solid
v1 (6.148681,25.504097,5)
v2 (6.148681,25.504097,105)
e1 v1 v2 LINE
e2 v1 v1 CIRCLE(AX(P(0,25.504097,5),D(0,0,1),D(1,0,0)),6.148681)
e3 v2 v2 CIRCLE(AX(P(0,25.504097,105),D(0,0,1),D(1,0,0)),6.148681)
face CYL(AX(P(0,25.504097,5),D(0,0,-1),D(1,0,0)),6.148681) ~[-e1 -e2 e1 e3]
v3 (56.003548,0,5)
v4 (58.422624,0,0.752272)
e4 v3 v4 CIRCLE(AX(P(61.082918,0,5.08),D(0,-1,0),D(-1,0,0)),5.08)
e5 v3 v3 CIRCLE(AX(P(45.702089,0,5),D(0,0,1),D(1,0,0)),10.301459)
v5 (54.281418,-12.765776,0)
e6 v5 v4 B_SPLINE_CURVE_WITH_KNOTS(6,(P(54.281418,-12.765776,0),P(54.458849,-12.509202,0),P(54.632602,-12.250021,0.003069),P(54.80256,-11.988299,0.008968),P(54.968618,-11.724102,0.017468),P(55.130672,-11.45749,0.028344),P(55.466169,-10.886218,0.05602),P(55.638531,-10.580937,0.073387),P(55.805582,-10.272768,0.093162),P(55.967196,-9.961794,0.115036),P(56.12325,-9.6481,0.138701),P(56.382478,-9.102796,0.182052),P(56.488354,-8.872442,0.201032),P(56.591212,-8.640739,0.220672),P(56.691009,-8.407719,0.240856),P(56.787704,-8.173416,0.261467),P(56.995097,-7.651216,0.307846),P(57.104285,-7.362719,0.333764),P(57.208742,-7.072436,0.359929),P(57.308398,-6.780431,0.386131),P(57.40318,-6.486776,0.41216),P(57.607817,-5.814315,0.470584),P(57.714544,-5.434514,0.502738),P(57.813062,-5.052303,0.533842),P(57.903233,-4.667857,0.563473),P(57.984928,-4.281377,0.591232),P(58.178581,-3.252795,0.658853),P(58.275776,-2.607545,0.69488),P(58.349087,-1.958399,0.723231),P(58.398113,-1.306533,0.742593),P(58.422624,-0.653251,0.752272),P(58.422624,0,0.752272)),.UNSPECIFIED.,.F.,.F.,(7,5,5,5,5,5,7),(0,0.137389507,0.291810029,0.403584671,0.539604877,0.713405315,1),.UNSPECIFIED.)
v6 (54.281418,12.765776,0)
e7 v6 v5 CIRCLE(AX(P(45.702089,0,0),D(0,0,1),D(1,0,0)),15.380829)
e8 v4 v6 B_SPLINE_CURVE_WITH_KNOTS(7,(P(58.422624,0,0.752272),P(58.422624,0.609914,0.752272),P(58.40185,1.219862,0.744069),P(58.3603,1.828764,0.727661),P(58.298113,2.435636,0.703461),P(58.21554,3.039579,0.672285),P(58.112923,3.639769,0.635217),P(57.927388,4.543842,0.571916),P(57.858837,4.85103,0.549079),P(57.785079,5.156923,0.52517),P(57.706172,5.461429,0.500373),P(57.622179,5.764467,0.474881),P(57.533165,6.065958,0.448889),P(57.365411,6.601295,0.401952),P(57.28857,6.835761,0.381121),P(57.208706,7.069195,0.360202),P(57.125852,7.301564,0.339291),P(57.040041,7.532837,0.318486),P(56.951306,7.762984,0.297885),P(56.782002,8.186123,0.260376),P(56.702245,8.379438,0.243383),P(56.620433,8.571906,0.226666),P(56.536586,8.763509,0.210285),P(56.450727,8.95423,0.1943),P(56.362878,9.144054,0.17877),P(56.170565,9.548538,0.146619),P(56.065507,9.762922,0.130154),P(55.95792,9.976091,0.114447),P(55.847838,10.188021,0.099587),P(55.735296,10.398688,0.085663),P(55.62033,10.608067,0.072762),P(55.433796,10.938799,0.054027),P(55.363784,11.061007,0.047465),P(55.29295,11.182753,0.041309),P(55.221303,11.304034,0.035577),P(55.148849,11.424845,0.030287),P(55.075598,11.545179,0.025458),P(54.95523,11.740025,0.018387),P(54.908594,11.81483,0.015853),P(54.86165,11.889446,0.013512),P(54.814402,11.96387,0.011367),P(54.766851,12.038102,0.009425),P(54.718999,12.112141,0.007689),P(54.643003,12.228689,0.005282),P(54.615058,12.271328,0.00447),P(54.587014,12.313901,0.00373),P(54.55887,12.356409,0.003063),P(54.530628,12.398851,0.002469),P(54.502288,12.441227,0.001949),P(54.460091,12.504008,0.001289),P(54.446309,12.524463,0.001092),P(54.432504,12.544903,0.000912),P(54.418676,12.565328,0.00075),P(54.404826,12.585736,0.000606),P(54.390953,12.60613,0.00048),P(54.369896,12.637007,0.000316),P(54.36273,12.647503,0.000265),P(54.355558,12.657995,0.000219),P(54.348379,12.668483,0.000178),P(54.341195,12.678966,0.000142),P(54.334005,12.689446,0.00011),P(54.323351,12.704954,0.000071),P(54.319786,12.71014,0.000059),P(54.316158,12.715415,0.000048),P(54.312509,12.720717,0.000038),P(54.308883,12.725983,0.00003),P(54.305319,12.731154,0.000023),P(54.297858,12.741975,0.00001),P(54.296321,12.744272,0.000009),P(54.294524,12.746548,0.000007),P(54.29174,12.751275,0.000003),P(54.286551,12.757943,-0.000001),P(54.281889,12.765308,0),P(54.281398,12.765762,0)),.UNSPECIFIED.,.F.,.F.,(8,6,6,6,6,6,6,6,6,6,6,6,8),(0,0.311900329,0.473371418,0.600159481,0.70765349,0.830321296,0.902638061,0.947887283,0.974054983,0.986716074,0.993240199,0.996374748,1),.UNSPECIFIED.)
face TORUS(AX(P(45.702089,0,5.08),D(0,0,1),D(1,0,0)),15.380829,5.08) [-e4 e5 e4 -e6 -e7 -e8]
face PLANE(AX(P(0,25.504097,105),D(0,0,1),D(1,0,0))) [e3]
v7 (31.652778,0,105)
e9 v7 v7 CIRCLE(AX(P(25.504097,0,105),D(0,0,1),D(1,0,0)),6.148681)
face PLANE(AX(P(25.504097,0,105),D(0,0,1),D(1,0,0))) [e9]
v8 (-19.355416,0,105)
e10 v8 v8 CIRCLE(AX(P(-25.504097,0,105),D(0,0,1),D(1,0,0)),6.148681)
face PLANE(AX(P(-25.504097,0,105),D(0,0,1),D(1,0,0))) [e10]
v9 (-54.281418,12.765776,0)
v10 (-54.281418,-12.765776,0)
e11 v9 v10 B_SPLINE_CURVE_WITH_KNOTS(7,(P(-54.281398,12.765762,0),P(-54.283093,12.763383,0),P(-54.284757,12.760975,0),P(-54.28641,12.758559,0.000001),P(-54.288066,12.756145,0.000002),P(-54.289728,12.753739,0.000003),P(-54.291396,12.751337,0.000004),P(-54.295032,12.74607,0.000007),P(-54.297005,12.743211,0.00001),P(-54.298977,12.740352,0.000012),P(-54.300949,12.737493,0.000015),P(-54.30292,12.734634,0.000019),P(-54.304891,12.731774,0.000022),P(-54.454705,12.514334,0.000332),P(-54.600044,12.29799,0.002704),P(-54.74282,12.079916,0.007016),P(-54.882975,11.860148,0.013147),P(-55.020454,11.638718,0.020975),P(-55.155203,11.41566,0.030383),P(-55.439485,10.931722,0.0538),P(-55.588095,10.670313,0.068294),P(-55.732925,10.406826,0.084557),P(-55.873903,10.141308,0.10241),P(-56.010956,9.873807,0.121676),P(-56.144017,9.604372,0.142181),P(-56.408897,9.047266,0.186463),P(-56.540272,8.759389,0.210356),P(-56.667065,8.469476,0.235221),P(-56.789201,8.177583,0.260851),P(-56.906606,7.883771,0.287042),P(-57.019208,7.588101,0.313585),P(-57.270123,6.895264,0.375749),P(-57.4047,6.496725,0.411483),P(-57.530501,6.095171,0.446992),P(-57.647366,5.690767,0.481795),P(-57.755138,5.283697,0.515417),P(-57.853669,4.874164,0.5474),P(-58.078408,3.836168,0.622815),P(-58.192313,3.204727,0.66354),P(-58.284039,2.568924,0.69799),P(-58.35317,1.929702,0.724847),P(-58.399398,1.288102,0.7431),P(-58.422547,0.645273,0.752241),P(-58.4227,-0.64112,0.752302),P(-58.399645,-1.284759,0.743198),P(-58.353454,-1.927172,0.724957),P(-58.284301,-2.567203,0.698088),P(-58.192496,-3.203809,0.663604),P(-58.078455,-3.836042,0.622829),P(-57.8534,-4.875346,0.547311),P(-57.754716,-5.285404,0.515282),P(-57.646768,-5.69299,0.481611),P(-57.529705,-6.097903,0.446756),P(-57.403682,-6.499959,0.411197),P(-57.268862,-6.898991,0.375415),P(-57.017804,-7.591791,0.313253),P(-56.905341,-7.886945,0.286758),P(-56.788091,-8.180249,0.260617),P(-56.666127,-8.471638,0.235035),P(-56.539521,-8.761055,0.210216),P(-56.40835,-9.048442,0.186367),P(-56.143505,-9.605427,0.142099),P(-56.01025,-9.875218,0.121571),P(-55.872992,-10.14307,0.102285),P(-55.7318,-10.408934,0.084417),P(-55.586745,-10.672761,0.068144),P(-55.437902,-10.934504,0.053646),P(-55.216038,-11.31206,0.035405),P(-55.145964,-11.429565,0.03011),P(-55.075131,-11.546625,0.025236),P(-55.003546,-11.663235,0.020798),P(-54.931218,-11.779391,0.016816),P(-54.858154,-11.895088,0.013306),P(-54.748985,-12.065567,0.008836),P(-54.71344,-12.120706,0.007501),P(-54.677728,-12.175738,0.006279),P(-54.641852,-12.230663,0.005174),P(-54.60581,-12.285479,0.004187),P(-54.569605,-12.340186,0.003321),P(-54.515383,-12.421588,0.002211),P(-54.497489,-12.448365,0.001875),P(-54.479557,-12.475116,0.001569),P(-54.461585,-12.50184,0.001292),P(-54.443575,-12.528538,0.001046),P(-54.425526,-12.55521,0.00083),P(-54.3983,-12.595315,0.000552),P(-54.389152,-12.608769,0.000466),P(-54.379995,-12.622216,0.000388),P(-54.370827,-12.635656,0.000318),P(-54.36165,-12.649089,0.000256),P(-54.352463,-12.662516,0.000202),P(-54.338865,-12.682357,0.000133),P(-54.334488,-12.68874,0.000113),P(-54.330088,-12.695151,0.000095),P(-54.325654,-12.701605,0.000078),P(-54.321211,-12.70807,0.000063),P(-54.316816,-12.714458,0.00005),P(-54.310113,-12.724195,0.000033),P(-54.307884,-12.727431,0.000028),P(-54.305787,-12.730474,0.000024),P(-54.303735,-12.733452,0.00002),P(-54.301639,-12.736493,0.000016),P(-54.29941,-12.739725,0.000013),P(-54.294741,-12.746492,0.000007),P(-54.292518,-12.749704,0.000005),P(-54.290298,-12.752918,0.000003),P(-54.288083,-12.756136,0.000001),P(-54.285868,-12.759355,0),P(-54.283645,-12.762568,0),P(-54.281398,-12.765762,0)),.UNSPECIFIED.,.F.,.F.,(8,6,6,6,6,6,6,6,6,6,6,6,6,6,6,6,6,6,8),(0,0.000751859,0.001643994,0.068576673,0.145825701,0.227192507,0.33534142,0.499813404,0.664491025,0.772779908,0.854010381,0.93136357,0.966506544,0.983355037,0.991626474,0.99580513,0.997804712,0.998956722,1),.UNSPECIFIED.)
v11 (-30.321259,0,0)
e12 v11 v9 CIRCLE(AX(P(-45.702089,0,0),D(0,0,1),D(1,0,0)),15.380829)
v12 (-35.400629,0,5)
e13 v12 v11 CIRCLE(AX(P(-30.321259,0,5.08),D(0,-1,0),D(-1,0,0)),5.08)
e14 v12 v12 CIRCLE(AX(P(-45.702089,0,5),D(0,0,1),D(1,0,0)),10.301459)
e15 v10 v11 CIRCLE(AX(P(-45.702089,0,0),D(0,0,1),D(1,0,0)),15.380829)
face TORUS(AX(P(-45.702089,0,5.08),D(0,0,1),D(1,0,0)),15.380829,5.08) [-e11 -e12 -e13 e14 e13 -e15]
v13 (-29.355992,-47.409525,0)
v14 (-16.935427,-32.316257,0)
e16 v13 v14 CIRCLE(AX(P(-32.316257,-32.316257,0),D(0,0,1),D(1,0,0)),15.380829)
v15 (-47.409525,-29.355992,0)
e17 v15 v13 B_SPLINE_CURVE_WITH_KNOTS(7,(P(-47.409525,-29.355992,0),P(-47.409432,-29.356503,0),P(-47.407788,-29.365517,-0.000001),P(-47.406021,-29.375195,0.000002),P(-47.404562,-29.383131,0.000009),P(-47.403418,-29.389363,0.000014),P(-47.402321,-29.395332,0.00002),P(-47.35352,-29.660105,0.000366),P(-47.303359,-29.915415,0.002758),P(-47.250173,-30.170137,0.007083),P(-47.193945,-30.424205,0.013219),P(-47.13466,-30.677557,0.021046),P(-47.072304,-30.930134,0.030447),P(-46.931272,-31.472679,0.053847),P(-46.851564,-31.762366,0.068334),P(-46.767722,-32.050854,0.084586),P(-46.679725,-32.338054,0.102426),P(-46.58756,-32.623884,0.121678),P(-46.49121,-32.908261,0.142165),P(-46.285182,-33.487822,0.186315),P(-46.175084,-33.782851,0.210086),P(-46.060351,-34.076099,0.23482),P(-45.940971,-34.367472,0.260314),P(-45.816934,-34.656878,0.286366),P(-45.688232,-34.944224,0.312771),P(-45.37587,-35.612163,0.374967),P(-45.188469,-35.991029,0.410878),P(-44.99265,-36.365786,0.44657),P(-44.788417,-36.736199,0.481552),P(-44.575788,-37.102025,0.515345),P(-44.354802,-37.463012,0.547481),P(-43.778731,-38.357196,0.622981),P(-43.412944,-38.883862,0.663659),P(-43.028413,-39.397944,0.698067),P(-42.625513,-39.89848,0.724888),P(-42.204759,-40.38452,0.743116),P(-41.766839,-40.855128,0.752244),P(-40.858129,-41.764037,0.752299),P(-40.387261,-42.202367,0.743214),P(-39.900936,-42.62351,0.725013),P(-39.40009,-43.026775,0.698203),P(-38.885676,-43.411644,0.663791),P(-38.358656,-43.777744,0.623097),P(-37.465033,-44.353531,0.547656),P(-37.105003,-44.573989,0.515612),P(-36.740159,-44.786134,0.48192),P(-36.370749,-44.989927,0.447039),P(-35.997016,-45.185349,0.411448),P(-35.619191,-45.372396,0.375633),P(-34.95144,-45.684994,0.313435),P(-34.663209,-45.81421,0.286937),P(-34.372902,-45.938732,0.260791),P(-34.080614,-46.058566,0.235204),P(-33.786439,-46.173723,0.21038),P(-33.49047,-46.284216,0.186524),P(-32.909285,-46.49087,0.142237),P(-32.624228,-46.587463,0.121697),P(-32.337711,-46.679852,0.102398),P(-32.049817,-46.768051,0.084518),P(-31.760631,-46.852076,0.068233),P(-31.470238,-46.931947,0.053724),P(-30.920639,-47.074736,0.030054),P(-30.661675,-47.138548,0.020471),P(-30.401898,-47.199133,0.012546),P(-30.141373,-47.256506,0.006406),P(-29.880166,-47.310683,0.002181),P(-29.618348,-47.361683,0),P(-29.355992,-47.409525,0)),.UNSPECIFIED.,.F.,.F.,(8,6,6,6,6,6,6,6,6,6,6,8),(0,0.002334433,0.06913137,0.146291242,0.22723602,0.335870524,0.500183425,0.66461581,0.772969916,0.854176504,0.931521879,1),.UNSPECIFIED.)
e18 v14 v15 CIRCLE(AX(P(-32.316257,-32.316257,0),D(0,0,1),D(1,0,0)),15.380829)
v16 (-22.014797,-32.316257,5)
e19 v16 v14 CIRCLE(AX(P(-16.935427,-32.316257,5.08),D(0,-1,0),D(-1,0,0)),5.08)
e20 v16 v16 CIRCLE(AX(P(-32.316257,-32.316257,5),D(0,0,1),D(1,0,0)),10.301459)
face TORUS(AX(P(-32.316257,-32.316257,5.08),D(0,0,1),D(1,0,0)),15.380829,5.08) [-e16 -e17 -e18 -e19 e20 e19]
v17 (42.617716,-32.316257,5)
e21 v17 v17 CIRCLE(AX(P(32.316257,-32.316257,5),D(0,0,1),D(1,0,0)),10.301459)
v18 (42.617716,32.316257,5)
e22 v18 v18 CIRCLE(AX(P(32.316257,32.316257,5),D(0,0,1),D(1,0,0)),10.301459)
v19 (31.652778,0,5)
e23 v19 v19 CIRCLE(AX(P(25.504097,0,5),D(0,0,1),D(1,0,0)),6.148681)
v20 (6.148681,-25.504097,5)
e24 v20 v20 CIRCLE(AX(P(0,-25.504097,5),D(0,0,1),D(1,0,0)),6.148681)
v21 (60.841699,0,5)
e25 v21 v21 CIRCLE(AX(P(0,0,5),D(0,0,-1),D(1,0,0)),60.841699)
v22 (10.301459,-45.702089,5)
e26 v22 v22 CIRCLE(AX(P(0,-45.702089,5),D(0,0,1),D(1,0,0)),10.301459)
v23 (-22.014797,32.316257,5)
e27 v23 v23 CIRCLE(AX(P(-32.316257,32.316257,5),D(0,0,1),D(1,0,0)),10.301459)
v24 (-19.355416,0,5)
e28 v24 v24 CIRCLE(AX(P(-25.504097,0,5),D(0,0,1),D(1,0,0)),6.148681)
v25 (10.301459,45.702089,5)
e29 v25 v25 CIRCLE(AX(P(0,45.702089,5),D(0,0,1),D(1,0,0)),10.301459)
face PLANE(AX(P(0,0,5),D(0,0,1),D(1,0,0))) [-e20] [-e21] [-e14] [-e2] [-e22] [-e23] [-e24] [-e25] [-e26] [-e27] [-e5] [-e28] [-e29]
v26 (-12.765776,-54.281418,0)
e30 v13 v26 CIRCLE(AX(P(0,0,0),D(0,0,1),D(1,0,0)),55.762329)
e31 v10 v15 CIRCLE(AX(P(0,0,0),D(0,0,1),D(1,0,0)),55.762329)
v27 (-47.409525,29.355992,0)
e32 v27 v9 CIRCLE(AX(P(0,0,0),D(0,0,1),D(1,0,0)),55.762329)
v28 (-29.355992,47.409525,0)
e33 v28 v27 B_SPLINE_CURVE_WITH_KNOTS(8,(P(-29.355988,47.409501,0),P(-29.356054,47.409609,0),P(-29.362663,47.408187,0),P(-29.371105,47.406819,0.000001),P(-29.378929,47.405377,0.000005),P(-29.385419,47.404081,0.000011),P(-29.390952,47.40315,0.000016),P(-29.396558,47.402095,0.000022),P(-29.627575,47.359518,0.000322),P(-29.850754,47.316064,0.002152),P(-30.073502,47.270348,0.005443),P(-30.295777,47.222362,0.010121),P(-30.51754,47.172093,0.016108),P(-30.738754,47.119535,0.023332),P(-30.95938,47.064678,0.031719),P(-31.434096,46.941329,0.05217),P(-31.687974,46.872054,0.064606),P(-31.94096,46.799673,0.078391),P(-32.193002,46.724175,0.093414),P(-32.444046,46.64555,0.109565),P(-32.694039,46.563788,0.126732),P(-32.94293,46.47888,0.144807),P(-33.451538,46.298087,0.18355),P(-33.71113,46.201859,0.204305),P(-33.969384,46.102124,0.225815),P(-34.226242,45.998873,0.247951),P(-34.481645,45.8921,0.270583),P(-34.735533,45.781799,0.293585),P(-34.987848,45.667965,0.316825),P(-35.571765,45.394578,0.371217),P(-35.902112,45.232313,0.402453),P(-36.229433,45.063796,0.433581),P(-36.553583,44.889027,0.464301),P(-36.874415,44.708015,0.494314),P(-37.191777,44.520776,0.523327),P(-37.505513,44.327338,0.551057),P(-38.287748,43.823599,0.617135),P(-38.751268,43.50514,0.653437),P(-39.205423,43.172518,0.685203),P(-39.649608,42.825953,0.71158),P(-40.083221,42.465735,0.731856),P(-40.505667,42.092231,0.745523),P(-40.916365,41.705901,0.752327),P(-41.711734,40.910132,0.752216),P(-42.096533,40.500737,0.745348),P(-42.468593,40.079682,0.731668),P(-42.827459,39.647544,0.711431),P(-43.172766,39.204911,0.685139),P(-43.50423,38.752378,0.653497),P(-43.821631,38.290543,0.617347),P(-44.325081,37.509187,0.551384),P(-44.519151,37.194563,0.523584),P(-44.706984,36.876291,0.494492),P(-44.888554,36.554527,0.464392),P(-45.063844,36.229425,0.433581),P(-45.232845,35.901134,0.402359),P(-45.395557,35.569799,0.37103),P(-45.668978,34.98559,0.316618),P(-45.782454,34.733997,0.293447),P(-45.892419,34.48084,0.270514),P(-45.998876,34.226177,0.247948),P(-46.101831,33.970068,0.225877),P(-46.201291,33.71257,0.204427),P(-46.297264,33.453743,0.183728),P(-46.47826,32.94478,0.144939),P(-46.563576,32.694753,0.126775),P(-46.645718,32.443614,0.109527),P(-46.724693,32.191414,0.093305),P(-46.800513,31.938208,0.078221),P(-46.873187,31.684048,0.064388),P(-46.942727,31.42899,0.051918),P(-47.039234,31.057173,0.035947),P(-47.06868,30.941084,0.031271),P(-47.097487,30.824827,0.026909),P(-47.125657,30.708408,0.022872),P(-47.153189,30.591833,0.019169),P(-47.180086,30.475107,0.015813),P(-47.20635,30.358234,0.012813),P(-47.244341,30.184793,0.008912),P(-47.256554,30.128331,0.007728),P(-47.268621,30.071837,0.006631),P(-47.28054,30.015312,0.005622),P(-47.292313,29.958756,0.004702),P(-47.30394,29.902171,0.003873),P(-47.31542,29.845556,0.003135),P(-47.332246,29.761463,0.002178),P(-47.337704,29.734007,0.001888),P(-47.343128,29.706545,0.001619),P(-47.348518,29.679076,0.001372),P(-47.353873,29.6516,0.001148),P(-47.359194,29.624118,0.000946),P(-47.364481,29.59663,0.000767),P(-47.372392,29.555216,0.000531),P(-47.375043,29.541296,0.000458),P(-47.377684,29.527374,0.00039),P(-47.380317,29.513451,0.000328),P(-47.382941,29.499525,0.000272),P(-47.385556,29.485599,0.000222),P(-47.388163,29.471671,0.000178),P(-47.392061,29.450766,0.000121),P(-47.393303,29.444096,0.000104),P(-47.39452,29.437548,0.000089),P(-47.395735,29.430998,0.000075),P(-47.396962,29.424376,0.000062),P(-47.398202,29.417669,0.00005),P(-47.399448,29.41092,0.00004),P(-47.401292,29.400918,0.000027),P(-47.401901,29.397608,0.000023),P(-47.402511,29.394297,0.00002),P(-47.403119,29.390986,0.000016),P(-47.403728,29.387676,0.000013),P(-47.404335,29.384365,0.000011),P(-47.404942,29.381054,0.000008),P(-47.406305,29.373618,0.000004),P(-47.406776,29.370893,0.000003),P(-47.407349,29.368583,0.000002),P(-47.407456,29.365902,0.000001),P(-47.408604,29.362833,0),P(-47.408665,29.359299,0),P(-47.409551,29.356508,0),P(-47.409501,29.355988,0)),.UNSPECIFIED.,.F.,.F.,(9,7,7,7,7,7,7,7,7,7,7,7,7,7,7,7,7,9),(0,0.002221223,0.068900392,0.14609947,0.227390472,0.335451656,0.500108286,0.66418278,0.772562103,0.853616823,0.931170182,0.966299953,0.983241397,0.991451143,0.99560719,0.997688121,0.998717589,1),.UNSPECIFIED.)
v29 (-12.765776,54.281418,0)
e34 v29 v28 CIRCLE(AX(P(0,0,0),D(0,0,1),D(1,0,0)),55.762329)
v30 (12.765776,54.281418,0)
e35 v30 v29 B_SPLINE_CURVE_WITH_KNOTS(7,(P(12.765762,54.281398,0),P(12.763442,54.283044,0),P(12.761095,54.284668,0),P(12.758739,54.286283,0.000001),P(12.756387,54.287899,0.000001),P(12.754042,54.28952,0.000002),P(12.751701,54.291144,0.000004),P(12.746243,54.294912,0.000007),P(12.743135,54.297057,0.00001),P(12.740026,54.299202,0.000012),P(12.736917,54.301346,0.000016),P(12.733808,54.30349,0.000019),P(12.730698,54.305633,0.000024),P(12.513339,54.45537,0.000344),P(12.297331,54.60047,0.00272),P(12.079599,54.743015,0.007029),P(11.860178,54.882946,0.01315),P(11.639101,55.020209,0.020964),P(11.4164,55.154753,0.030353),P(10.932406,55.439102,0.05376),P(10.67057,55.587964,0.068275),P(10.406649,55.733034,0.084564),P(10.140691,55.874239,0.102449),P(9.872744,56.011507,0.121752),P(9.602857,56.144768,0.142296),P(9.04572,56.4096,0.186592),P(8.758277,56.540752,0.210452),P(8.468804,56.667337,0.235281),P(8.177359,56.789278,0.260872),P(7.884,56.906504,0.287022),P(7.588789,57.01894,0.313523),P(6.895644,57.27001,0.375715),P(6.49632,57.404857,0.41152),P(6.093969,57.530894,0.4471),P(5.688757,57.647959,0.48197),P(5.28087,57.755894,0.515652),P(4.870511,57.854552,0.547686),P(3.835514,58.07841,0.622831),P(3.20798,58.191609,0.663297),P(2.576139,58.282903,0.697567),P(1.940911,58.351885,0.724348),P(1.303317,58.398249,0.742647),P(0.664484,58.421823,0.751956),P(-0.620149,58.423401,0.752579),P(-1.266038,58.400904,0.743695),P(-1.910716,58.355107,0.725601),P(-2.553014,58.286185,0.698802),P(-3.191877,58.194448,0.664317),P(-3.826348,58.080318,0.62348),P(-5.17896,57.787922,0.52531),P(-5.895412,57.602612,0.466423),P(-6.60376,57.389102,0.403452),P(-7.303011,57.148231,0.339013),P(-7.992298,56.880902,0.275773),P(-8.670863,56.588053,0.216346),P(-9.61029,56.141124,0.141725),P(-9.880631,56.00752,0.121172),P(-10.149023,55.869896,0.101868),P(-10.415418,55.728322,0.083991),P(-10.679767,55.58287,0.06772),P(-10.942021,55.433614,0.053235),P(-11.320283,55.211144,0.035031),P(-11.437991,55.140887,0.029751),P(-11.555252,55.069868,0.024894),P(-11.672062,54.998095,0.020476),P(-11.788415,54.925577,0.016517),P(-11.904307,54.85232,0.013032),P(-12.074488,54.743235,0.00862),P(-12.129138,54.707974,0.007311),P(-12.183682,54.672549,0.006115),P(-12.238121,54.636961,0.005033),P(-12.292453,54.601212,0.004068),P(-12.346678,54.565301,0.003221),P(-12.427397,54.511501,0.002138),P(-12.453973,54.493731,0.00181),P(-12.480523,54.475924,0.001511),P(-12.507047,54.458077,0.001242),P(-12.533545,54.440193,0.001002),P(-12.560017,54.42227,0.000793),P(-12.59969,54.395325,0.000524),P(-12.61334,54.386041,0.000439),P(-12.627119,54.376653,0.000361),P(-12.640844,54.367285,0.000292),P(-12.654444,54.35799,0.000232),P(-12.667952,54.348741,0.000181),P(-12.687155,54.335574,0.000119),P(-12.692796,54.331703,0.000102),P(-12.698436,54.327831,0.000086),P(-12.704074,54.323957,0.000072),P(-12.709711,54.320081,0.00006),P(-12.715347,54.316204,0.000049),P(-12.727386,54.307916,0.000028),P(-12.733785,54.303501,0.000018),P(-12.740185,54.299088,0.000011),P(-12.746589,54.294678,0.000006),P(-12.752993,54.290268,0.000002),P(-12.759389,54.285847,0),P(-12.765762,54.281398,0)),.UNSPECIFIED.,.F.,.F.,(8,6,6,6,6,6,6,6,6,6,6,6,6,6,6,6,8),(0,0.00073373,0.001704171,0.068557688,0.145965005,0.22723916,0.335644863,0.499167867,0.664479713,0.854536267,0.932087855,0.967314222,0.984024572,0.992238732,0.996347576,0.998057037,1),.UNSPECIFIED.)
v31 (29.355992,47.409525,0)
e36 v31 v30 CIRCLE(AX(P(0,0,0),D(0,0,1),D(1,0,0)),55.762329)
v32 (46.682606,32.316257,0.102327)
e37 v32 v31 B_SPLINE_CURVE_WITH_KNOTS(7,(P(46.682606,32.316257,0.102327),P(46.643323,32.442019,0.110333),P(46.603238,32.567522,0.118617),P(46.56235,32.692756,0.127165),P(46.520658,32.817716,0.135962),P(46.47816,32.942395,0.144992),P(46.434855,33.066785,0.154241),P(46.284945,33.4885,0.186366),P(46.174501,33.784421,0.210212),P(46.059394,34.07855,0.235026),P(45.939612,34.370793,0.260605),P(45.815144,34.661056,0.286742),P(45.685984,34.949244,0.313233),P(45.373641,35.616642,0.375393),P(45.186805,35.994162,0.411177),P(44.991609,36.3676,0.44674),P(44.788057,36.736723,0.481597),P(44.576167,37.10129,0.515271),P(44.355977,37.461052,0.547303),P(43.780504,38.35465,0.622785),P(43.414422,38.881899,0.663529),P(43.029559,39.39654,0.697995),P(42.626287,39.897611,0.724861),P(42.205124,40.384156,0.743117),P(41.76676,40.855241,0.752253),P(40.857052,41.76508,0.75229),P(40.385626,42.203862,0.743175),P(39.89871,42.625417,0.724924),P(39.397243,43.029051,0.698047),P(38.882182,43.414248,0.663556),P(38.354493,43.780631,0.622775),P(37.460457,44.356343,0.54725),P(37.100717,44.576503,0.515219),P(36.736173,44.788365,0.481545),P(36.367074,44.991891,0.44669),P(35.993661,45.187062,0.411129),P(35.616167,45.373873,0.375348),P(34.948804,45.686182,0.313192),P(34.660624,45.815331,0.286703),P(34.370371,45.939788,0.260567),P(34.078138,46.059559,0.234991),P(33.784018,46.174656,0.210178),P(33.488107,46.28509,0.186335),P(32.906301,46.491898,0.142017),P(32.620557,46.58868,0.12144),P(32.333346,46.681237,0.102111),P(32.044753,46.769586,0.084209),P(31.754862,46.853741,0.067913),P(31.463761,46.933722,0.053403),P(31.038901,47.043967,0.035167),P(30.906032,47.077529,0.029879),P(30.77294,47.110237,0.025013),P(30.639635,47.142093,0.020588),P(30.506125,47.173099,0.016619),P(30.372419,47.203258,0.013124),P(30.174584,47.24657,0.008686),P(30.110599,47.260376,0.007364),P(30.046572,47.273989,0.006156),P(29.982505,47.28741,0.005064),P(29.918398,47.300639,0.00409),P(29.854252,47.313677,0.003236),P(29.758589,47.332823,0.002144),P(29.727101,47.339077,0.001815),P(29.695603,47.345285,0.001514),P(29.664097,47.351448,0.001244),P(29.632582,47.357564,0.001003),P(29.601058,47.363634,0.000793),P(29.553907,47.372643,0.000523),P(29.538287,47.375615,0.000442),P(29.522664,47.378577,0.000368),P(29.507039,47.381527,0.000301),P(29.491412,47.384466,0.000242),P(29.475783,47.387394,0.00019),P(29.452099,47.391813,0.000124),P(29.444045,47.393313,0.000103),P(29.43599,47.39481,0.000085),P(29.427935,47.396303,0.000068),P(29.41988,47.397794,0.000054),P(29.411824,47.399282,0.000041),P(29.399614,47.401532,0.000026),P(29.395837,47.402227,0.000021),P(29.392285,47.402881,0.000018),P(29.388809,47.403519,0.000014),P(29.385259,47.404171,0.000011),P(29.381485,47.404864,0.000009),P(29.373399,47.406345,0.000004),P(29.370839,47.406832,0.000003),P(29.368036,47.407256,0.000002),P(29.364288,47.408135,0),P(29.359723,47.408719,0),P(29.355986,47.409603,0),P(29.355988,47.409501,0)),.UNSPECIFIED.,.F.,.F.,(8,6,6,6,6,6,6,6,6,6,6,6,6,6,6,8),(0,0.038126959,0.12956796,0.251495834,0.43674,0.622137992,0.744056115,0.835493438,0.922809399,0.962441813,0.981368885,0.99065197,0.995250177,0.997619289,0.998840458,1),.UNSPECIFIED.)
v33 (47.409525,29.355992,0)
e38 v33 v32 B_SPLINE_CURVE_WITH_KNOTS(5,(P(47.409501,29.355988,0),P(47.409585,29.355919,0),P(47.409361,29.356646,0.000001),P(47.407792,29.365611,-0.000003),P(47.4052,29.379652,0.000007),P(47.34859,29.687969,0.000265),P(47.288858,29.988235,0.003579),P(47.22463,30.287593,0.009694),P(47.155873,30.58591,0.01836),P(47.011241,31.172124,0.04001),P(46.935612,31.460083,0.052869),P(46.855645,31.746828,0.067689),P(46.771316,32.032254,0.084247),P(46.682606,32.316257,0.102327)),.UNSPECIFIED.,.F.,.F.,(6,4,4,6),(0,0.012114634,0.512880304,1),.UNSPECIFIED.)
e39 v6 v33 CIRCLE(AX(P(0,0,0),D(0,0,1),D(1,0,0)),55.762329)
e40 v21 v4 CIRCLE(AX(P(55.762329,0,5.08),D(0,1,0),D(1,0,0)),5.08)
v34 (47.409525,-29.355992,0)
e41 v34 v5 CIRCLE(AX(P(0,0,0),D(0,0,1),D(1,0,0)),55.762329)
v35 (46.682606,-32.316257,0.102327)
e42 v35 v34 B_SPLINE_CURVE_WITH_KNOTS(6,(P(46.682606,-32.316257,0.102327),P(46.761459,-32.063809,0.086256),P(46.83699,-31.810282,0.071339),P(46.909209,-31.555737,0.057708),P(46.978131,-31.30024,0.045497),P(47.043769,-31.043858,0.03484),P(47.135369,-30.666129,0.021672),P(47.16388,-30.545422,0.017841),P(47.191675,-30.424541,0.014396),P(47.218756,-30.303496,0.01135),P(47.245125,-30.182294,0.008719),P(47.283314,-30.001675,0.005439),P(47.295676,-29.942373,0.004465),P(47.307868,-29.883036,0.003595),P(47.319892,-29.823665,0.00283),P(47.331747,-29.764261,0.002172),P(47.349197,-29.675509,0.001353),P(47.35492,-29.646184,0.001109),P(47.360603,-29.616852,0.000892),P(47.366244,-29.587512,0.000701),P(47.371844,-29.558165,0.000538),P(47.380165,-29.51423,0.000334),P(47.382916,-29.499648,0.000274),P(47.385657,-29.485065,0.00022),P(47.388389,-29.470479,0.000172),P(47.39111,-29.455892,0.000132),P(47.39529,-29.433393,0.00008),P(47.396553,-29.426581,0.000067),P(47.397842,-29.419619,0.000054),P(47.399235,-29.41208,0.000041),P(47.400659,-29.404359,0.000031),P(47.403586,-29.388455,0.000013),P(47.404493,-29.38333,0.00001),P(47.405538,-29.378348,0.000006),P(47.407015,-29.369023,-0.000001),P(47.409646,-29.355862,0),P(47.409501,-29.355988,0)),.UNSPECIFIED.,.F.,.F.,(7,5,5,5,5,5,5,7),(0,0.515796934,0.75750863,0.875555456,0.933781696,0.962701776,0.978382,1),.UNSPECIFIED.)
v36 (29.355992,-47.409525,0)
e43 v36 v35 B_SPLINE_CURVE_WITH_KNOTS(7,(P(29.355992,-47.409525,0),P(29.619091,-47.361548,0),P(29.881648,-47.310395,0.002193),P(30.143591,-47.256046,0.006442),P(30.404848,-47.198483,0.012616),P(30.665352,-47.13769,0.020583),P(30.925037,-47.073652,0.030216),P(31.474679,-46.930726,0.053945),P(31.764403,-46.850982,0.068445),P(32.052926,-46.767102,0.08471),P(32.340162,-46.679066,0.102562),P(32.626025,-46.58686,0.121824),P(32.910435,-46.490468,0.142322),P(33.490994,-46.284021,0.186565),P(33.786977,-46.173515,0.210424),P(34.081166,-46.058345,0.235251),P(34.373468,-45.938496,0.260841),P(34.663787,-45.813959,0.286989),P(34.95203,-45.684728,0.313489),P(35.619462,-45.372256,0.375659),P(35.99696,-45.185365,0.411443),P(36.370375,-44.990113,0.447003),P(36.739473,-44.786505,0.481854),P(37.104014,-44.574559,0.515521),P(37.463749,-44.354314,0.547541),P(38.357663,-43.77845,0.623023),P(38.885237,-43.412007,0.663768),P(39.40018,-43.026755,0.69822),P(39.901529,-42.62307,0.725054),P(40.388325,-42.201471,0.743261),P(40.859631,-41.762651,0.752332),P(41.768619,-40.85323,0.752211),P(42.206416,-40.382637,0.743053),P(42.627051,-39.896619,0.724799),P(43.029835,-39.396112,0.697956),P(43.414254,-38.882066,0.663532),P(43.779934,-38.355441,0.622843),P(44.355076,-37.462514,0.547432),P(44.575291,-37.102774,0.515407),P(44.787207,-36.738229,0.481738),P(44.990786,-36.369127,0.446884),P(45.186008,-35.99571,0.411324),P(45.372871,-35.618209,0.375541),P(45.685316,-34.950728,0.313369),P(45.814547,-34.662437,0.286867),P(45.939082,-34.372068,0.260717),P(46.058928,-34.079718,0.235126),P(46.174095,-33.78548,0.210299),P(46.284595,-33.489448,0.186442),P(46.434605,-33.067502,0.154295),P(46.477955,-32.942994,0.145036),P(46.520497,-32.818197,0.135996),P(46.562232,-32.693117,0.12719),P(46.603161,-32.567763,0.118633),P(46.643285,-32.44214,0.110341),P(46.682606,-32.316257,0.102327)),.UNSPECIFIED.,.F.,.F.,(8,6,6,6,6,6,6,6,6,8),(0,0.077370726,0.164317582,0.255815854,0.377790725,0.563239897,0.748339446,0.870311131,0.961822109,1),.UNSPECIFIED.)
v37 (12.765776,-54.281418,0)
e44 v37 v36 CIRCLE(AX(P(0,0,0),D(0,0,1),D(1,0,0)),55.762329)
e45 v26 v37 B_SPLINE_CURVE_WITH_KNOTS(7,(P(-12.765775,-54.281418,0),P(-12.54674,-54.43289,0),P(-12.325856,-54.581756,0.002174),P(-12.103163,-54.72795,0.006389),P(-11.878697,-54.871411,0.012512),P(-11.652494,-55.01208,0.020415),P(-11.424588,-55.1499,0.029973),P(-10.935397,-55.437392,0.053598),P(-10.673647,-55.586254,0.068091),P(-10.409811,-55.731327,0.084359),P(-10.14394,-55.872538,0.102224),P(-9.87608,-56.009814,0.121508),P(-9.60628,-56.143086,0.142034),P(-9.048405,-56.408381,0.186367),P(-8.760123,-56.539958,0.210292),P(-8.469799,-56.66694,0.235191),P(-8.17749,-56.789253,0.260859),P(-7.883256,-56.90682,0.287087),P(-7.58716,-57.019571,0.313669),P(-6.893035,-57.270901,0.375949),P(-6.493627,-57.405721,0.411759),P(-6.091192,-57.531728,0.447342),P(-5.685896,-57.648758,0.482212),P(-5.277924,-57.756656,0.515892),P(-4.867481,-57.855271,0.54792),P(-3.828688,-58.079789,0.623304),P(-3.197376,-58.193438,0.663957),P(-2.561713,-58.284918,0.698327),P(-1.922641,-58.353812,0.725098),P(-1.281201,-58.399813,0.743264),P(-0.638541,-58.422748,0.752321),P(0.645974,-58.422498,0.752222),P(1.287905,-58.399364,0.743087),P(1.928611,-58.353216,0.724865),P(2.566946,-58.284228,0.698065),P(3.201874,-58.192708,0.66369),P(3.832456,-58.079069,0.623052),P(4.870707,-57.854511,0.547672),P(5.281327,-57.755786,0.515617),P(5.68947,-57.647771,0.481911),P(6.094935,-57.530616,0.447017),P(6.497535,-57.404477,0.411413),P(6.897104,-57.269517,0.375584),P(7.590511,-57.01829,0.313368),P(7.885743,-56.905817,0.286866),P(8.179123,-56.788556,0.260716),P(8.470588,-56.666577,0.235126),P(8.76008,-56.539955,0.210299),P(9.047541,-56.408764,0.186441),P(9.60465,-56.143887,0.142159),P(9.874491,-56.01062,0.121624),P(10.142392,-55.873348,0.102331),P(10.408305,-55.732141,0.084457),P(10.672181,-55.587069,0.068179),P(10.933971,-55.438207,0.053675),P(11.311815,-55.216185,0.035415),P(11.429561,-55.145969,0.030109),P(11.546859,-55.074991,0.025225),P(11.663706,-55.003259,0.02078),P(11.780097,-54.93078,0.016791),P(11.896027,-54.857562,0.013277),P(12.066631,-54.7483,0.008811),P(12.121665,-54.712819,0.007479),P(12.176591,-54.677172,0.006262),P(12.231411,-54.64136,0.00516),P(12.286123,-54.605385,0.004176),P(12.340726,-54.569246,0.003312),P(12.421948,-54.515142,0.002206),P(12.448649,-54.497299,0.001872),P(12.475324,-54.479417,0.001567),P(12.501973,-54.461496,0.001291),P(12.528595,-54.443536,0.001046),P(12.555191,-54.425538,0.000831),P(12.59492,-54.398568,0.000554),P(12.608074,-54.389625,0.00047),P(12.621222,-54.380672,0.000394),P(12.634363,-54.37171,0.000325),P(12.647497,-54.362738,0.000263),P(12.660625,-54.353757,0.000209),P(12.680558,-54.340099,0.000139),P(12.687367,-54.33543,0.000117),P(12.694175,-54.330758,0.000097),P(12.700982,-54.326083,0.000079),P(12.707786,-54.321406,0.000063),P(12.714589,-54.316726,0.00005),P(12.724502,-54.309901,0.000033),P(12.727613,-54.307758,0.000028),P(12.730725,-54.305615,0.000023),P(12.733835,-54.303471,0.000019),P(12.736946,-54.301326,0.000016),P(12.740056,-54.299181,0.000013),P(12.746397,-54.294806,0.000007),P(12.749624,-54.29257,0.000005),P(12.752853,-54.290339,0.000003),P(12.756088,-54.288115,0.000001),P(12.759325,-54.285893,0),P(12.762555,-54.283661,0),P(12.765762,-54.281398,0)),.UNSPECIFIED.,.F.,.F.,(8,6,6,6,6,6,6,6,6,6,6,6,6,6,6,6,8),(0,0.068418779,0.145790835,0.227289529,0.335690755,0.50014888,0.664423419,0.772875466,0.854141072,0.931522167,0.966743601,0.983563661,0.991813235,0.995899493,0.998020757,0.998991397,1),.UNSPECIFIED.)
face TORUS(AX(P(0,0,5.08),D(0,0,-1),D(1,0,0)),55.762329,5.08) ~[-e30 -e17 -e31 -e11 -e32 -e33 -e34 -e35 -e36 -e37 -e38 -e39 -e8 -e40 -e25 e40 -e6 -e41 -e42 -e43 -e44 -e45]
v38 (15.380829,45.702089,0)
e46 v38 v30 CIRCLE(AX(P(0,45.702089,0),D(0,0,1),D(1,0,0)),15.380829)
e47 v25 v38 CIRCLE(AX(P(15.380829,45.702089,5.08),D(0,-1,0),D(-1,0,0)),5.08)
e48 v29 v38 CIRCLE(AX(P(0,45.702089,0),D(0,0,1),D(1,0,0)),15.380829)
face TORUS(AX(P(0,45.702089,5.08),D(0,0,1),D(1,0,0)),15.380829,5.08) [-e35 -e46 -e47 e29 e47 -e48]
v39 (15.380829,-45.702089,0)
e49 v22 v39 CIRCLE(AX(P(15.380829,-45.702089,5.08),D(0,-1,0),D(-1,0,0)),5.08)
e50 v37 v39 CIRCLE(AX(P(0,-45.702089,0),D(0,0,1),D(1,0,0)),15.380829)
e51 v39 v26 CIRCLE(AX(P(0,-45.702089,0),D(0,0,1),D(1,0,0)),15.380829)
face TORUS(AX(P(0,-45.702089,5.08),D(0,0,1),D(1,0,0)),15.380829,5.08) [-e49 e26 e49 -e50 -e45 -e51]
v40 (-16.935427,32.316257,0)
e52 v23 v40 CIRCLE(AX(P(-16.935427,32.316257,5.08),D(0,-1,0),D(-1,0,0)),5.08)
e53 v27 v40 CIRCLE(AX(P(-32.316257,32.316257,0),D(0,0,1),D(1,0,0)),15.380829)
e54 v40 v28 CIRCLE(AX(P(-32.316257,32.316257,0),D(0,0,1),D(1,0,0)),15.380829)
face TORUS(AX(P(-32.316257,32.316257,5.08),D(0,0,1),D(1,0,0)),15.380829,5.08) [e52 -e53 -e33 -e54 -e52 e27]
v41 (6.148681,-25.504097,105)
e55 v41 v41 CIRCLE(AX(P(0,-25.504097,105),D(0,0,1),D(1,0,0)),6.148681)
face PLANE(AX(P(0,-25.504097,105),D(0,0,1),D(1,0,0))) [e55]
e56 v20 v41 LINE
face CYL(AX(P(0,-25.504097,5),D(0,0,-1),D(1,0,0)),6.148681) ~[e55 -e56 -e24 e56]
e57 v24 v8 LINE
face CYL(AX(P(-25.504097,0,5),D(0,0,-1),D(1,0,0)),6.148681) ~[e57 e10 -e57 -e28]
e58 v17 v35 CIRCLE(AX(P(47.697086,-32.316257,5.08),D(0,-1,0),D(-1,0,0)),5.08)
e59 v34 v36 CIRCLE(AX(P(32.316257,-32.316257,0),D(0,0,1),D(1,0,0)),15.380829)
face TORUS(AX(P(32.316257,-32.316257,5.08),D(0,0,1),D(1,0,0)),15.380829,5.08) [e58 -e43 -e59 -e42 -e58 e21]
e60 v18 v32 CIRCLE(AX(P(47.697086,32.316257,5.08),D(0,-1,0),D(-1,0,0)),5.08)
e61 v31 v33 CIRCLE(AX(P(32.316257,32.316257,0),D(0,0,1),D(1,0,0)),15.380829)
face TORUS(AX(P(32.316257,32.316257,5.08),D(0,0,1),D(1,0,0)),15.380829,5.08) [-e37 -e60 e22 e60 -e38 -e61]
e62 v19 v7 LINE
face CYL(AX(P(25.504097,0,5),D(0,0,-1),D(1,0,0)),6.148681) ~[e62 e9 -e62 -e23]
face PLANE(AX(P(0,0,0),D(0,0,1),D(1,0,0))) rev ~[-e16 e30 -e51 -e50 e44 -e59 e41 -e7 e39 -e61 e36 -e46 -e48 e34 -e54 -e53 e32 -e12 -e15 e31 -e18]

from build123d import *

# Parameters (mm, degrees)
F0_R     = 60.8423289751
F0_R_2   = 10.3008294325
F1_DEPTH = 5
F3_R     = 6.1486808816
F4_DEPTH = 100


# Not quite as in the source:
# - a fillet or chamfer that OpenCascade refuses, or shapes differently, is made with other operations: its cross-section is extruded or revolved along the edge and cut away or added


with BuildPart() as f1:
    # F0 (on Top) → F1 (new body)
    with BuildSketch(Plane.XY):
        Circle(F0_R)
        with Locations((-32.3162567806, -32.3162567806)):
            Circle(F0_R_2, mode=Mode.SUBTRACT)
        with Locations((0, -45.7020886242)):
            Circle(F0_R_2, mode=Mode.SUBTRACT)
        with Locations((32.3162567806, -32.3162567806)):
            Circle(F0_R_2, mode=Mode.SUBTRACT)
        with Locations((-45.7020886242, 0)):
            Circle(F0_R_2, mode=Mode.SUBTRACT)
        with Locations((-32.3162567806, 32.3162567806)):
            Circle(F0_R_2, mode=Mode.SUBTRACT)
        with Locations((45.7020886242, 0)):
            Circle(F0_R_2, mode=Mode.SUBTRACT)
        with Locations((0, 45.7020886242)):
            Circle(F0_R_2, mode=Mode.SUBTRACT)
        with Locations((32.3162567806, 32.3162567806)):
            Circle(F0_R_2, mode=Mode.SUBTRACT)
    extrude(amount=F1_DEPTH)

    # F2: fillet of radius 5.08 on 9 edges, made by hand

    # F2_s1 → F2_t2 (revolve, cut)
    with BuildSketch(Plane.XZ):
        with BuildLine():
            ThreePointArc((60.8423289751, 5.08), (59.3544314235, 1.4878975516), (55.7623289751, 0))
            Line((55.7623289751, 0), (60.8423289751, 0))
            Line((60.8423289751, 0), (60.8423289751, 5.08))
        make_face()
    revolve(axis=Axis((0, 0, 0), (0, 0, 1)), mode=Mode.SUBTRACT)

    # F2_s3 → F2_t4 (revolve, cut)
    with BuildSketch(Plane.XZ.offset(32.3162567806)):
        with BuildLine():
            ThreePointArc((-22.0154273481, 5.08), (-20.5275297965, 1.4878975516), (-16.9354273481, 0))
            Line((-16.9354273481, 0), (-22.0154273481, 0))
            Line((-22.0154273481, 0), (-22.0154273481, 5.08))
        make_face()
    revolve(axis=Axis((-32.3162567806, -32.3162567806, 0), (0, 0, 1)), mode=Mode.SUBTRACT)

    # F2_s5 → F2_t6 (revolve, cut)
    with BuildSketch(Plane.XZ.offset(45.7020886242)):
        with BuildLine():
            ThreePointArc((10.3008294325, 5.08), (11.7887269841, 1.4878975516), (15.3808294325, 0))
            Line((15.3808294325, 0), (10.3008294325, 0))
            Line((10.3008294325, 0), (10.3008294325, 5.08))
        make_face()
    revolve(axis=Axis((0, -45.7020886242, 0), (0, 0, 1)), mode=Mode.SUBTRACT)

    # F2_s7 → F2_t8 (revolve, cut)
    with BuildSketch(Plane.XZ.offset(32.3162567806)):
        with BuildLine():
            ThreePointArc((42.6170862131, 5.08), (44.1049837647, 1.4878975516), (47.6970862131, 0))
            Line((47.6970862131, 0), (42.6170862131, 0))
            Line((42.6170862131, 0), (42.6170862131, 5.08))
        make_face()
    revolve(axis=Axis((32.3162567806, -32.3162567806, 0), (0, 0, 1)), mode=Mode.SUBTRACT)

    # F2_s9 → F2_t10 (revolve, cut)
    with BuildSketch(Plane.XZ):
        with BuildLine():
            ThreePointArc((-35.4012591917, 5.08), (-33.9133616402, 1.4878975516), (-30.3212591917, 0))
            Line((-30.3212591917, 0), (-35.4012591917, 0))
            Line((-35.4012591917, 0), (-35.4012591917, 5.08))
        make_face()
    revolve(axis=Axis((-45.7020886242, 0, 0), (0, 0, 1)), mode=Mode.SUBTRACT)

    # F2_s11 → F2_t12 (revolve, cut)
    with BuildSketch(Plane.XZ.offset(-32.3162567806)):
        with BuildLine():
            ThreePointArc((-22.0154273481, 5.08), (-20.5275297965, 1.4878975516), (-16.9354273481, 0))
            Line((-16.9354273481, 0), (-22.0154273481, 0))
            Line((-22.0154273481, 0), (-22.0154273481, 5.08))
        make_face()
    revolve(axis=Axis((-32.3162567806, 32.3162567806, 0), (0, 0, 1)), mode=Mode.SUBTRACT)

    # F2_s13 → F2_t14 (revolve, cut)
    with BuildSketch(Plane.XZ):
        with BuildLine():
            ThreePointArc((56.0029180567, 5.08), (57.4908156083, 1.4878975516), (61.0829180567, 0))
            Line((61.0829180567, 0), (56.0029180567, 0))
            Line((56.0029180567, 0), (56.0029180567, 5.08))
        make_face()
    revolve(axis=Axis((45.7020886242, 0, 0), (0, 0, 1)), mode=Mode.SUBTRACT)

    # F2_s15 → F2_t16 (revolve, cut)
    with BuildSketch(Plane.XZ.offset(-45.7020886242)):
        with BuildLine():
            ThreePointArc((10.3008294325, 5.08), (11.7887269841, 1.4878975516), (15.3808294325, 0))
            Line((15.3808294325, 0), (10.3008294325, 0))
            Line((10.3008294325, 0), (10.3008294325, 5.08))
        make_face()
    revolve(axis=Axis((0, 45.7020886242, 0), (0, 0, 1)), mode=Mode.SUBTRACT)

    # F2_s17 → F2_t18 (revolve, cut)
    with BuildSketch(Plane.XZ.offset(-32.3162567806)):
        with BuildLine():
            ThreePointArc((42.6170862131, 5.08), (44.1049837647, 1.4878975516), (47.6970862131, 0))
            Line((47.6970862131, 0), (42.6170862131, 0))
            Line((42.6170862131, 0), (42.6170862131, 5.08))
        make_face()
    revolve(axis=Axis((32.3162567806, 32.3162567806, 0), (0, 0, 1)), mode=Mode.SUBTRACT)

    # F3 (on face) → F4 (join)
    with BuildSketch(Plane.XY.offset(5)):
        with Locations((0, 25.5040973425)):
            Circle(F3_R)
        with Locations((-25.5040973425, 0)):
            Circle(F3_R)
        with Locations((0, -25.5040973425)):
            Circle(F3_R)
        with Locations((25.5040973425, 0)):
            Circle(F3_R)
    extrude(amount=F4_DEPTH)


solid = f1.part
